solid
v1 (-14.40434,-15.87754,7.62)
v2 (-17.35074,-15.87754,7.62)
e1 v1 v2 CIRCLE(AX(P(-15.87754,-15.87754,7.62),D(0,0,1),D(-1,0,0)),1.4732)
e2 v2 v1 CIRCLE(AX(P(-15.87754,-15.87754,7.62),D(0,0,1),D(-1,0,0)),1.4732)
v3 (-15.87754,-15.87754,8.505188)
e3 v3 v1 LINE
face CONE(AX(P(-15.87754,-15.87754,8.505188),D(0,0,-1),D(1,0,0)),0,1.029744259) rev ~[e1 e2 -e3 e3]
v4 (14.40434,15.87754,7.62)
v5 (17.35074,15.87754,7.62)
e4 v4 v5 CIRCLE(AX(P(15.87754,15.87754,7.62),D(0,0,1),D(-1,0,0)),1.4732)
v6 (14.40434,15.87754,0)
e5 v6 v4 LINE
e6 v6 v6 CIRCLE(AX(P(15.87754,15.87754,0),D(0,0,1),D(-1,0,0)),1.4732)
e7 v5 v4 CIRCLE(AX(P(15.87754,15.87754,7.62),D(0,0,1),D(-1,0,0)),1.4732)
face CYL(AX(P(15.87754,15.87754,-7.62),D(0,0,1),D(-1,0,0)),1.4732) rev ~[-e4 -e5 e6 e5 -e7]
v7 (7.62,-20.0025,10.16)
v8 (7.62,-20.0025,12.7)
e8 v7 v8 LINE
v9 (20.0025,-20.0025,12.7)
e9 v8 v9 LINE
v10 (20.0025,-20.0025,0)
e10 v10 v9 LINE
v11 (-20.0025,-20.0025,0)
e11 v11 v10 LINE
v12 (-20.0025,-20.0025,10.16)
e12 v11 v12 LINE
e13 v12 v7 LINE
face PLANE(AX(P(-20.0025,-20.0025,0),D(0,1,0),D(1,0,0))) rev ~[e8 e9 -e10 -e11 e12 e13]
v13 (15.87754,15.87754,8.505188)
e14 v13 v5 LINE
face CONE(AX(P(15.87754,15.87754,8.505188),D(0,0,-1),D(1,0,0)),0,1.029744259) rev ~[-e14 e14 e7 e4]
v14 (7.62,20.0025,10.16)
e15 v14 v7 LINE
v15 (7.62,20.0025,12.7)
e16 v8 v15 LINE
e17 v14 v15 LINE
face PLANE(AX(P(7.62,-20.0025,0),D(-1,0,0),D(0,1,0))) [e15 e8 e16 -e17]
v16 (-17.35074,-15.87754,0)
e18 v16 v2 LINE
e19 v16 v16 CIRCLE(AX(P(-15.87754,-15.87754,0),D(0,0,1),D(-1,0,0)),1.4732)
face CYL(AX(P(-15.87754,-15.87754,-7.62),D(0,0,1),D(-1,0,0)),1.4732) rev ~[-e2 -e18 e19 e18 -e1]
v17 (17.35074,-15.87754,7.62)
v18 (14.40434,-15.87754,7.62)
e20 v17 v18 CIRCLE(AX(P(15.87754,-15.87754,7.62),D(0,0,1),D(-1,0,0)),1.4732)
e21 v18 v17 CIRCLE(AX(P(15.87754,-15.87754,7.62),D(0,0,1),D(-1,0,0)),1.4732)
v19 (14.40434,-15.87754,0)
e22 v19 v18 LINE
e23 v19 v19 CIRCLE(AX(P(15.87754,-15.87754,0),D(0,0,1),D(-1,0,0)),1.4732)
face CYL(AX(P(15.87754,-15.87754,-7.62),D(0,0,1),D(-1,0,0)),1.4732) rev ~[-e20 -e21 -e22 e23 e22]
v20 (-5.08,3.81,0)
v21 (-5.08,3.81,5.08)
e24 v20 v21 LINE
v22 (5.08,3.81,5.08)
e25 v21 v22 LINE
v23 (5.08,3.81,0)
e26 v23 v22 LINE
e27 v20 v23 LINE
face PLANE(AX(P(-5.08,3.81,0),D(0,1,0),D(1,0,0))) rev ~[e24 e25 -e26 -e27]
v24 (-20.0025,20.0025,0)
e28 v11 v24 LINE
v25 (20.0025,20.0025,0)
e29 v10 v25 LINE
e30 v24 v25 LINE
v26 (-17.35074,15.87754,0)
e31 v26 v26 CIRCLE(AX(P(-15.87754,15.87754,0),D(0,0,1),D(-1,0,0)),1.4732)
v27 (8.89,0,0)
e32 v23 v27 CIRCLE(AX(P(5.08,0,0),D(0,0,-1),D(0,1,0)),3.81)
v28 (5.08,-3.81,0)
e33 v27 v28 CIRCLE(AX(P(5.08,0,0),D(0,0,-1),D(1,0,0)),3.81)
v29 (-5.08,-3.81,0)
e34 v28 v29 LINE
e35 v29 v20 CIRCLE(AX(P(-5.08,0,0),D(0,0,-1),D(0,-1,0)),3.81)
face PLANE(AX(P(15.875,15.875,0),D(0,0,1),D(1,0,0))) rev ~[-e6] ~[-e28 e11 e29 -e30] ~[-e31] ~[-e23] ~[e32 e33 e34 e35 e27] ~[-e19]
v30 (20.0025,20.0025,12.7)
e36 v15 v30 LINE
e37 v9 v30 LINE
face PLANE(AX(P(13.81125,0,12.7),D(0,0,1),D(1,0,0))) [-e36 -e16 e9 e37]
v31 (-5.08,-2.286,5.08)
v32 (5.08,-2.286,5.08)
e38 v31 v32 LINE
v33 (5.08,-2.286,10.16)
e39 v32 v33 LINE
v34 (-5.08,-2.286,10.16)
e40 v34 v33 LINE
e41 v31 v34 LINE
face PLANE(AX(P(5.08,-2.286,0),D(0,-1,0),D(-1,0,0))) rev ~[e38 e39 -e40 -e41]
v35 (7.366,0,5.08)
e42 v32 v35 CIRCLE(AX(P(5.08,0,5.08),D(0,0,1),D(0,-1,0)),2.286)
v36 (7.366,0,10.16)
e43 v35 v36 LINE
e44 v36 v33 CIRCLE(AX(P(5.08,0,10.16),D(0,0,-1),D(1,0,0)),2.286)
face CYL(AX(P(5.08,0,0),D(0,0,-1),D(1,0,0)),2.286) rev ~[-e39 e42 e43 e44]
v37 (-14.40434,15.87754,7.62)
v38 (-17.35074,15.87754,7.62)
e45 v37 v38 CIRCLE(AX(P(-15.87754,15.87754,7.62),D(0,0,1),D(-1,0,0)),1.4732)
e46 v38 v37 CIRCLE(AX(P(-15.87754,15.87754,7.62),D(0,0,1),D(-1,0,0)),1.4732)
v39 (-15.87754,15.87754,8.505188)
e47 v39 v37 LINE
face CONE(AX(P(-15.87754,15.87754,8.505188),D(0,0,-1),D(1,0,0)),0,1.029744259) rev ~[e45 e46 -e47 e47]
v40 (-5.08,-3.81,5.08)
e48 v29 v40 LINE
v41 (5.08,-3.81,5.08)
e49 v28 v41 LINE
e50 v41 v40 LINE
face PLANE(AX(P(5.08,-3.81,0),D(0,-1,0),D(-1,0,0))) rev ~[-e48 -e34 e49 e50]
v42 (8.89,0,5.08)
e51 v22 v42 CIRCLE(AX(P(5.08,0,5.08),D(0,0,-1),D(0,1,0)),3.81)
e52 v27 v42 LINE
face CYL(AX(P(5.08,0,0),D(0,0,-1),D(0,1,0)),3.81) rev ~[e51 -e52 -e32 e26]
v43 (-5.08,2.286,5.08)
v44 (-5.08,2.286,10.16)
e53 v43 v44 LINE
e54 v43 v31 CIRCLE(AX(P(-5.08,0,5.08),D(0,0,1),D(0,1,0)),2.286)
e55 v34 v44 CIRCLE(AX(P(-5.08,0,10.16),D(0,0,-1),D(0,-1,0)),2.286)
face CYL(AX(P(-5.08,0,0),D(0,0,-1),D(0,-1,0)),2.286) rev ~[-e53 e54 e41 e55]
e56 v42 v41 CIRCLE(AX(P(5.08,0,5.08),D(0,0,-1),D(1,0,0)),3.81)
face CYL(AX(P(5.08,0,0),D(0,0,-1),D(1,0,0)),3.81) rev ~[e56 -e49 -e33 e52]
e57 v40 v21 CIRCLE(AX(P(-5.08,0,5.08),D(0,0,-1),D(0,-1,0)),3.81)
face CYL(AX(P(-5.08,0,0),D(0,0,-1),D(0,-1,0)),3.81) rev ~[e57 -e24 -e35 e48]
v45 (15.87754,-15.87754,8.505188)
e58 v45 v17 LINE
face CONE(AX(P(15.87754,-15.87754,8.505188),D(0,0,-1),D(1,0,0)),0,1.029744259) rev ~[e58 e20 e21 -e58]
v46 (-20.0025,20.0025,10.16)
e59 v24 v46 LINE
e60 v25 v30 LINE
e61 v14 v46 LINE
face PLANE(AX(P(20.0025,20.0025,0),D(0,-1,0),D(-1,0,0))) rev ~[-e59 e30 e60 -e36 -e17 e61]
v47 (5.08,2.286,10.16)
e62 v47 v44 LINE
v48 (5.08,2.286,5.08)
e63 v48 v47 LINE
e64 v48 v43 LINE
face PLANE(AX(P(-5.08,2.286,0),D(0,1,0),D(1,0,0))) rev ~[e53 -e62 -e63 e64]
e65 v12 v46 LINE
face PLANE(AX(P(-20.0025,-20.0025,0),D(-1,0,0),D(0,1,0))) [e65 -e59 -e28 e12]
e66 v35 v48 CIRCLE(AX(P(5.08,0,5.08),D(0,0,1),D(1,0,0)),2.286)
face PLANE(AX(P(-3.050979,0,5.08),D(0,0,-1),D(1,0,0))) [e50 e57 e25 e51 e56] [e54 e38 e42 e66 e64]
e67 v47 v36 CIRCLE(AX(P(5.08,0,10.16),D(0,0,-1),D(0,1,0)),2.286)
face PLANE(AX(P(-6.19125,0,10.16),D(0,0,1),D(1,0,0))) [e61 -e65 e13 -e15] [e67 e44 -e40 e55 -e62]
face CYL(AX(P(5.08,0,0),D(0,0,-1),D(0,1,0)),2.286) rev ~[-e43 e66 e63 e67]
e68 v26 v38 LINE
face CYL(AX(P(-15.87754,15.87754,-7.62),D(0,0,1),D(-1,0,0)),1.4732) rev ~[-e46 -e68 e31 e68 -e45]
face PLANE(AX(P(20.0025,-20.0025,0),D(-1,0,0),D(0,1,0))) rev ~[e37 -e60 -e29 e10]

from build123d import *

# Parameters (mm, degrees)
F0_W     = 27.6225
F0_H     = 40.005
F0_R     = 3.302
F0_W_2   = 12.3825
F0_R_2   = 2.159
F1_DEPTH = 10.16
F2_DEPTH = 12.7
F4_DEPTH = 25.4
F5_DEPTH = 5.08
F6_DEPTH = 12.7
F8_D     = 2.9464
F8_DEPTH = 7.62
F8_TIP   = 0.885187864


# Not quite as in the source:
# - a feature names something its author has since deleted; it is built from what else it names


with BuildPart() as f1:
    # F0 (on Top) → F1 (new body)
    with BuildSketch(Plane.XY):
        with Locations((-6.19125, 0)):
            Rectangle(F0_W, F0_H)
        with Locations((-15.875, -15.875)):
            Circle(F0_R, mode=Mode.SUBTRACT)
        with Locations((-15.875, 15.875)):
            Circle(F0_R, mode=Mode.SUBTRACT)
        with Locations((13.81125, 0)):
            Rectangle(F0_W_2, F0_H)
        with Locations((15.875, -15.875)):
            Circle(F0_R, mode=Mode.SUBTRACT)
        with Locations((15.875, 15.875)):
            Circle(F0_R, mode=Mode.SUBTRACT)
        with Locations((-15.875, 15.875)):
            Circle(F0_R)
        with Locations((-15.875, 15.875)):
            Circle(F0_R_2, mode=Mode.SUBTRACT)
        with Locations((15.875, 15.875)):
            Circle(F0_R)
        with Locations((15.875, 15.875)):
            Circle(F0_R_2, mode=Mode.SUBTRACT)
        with Locations((15.875, -15.875)):
            Circle(F0_R)
        with Locations((15.875, -15.875)):
            Circle(F0_R_2, mode=Mode.SUBTRACT)
        with Locations((-15.875, -15.875)):
            Circle(F0_R)
        with Locations((-15.875, -15.875)):
            Circle(F0_R_2, mode=Mode.SUBTRACT)
        with Locations((-15.875, 15.875)):
            Circle(F0_R_2)
        with Locations((15.875, 15.875)):
            Circle(F0_R_2)
        with Locations((15.875, -15.875)):
            Circle(F0_R_2)
        with Locations((-15.875, -15.875)):
            Circle(F0_R_2)
    extrude(amount=F1_DEPTH)

    # F0 (on Top) → F2 (join)
    with BuildSketch(Plane.XY):
        with Locations((13.81125, 0)):
            Rectangle(F0_W_2, F0_H)
        with Locations((15.875, -15.875)):
            Circle(F0_R, mode=Mode.SUBTRACT)
        with Locations((15.875, 15.875)):
            Circle(F0_R, mode=Mode.SUBTRACT)
    extrude(amount=F2_DEPTH)

    # F3 (on face) → F4 (cut)
    with BuildSketch(Plane(origin=(0, 0, 0), x_dir=(1, 0, 0), z_dir=(0, 0, -1))):
        with BuildLine():
            ThreePointArc((-2.794, 0), (-3.4635538982, 1.6164461018), (-5.08, 2.286))
            ThreePointArc((-5.08, 2.286), (-7.366, 0), (-5.08, -2.286))
            ThreePointArc((-5.08, -2.286), (-3.4635538982, -1.6164461018), (-2.794, 0))
        make_face()
        with BuildLine():
            ThreePointArc((7.366, 0), (6.6964461018, 1.6164461018), (5.08, 2.286))
            ThreePointArc((5.08, 2.286), (2.794, 0), (5.08, -2.286))
            ThreePointArc((5.08, -2.286), (6.6964461018, -1.6164461018), (7.366, 0))
        make_face()
        with BuildLine():
            ThreePointArc((-1.27, 0), (-1.4655166344, 1.2048277885), (-2.032, 2.286))
            Line((-2.032, 2.286), (-5.08, 2.286))
            ThreePointArc((-5.08, 2.286), (-3.4635538982, 1.6164461018), (-2.794, 0))
            ThreePointArc((-2.794, 0), (-3.4635538982, -1.6164461018), (-5.08, -2.286))
            Line((-5.08, -2.286), (-2.032, -2.286))
            ThreePointArc((-2.032, -2.286), (-1.4655166344, -1.2048277885), (-1.27, 0))
        make_face()
        with BuildLine():
            ThreePointArc((2.032, -2.286), (1.27, 0), (2.032, 2.286))
            Line((2.032, 2.286), (-2.032, 2.286))
            ThreePointArc((-2.032, 2.286), (-1.4655166344, 1.2048277885), (-1.27, 0))
            ThreePointArc((-1.27, 0), (-1.4655166344, -1.2048277885), (-2.032, -2.286))
            Line((-2.032, -2.286), (2.032, -2.286))
        make_face()
        with BuildLine():
            Line((5.08, 2.286), (2.032, 2.286))
            ThreePointArc((2.032, 2.286), (1.27, 0), (2.032, -2.286))
            Line((2.032, -2.286), (5.08, -2.286))
            ThreePointArc((5.08, -2.286), (2.794, 0), (5.08, 2.286))
        make_face()
    extrude(amount=-F4_DEPTH, mode=Mode.SUBTRACT)

    # F3 (on face) → F5 (cut)
    with BuildSketch(Plane(origin=(0, 0, 0), x_dir=(1, 0, 0), z_dir=(0, 0, -1))):
        with BuildLine():
            ThreePointArc((-1.27, 0), (-1.4655166344, 1.2048277885), (-2.032, 2.286))
            Line((-2.032, 2.286), (-5.08, 2.286))
            ThreePointArc((-5.08, 2.286), (-3.4635538982, 1.6164461018), (-2.794, 0))
            ThreePointArc((-2.794, 0), (-3.4635538982, -1.6164461018), (-5.08, -2.286))
            Line((-5.08, -2.286), (-2.032, -2.286))
            ThreePointArc((-2.032, -2.286), (-1.4655166344, -1.2048277885), (-1.27, 0))
        make_face()
        with BuildLine():
            ThreePointArc((-2.032, 2.286), (-3.3761162011, 3.4077675977), (-5.08, 3.81))
            ThreePointArc((-5.08, 3.81), (-8.89, 0), (-5.08, -3.81))
            ThreePointArc((-5.08, -3.81), (-3.3761162011, -3.4077675977), (-2.032, -2.286))
            Line((-2.032, -2.286), (-5.08, -2.286))
            ThreePointArc((-5.08, -2.286), (-7.366, 0), (-5.08, 2.286))
            Line((-5.08, 2.286), (-2.032, 2.286))
        make_face()
        with BuildLine():
            ThreePointArc((2.032, 2.286), (3.3761162011, 3.4077675977), (5.08, 3.81))
            Line((5.08, 3.81), (-5.08, 3.81))
            ThreePointArc((-5.08, 3.81), (-3.3761162011, 3.4077675977), (-2.032, 2.286))
            Line((-2.032, 2.286), (2.032, 2.286))
        make_face()
        with BuildLine():
            ThreePointArc((2.032, -2.286), (1.27, 0), (2.032, 2.286))
            Line((2.032, 2.286), (-2.032, 2.286))
            ThreePointArc((-2.032, 2.286), (-1.4655166344, 1.2048277885), (-1.27, 0))
            ThreePointArc((-1.27, 0), (-1.4655166344, -1.2048277885), (-2.032, -2.286))
            Line((-2.032, -2.286), (2.032, -2.286))
        make_face()
        with BuildLine():
            Line((5.08, 2.286), (2.032, 2.286))
            ThreePointArc((2.032, 2.286), (1.27, 0), (2.032, -2.286))
            Line((2.032, -2.286), (5.08, -2.286))
            ThreePointArc((5.08, -2.286), (2.794, 0), (5.08, 2.286))
        make_face()
        with BuildLine():
            ThreePointArc((5.08, -3.81), (7.7740768363, -2.6940768363), (8.89, 0))
            ThreePointArc((8.89, 0), (7.7740768363, 2.6940768363), (5.08, 3.81))
            ThreePointArc((5.08, 3.81), (3.3761162011, 3.4077675977), (2.032, 2.286))
            Line((2.032, 2.286), (5.08, 2.286))
            ThreePointArc((5.08, 2.286), (6.6964461018, 1.6164461018), (7.366, 0))
            ThreePointArc((7.366, 0), (6.6964461018, -1.6164461018), (5.08, -2.286))
            Line((5.08, -2.286), (2.032, -2.286))
            ThreePointArc((2.032, -2.286), (3.3761162011, -3.4077675977), (5.08, -3.81))
        make_face()
        with BuildLine():
            Line((-5.08, -3.81), (5.08, -3.81))
            ThreePointArc((5.08, -3.81), (3.3761162011, -3.4077675977), (2.032, -2.286))
            Line((2.032, -2.286), (-2.032, -2.286))
            ThreePointArc((-2.032, -2.286), (-3.3761162011, -3.4077675977), (-5.08, -3.81))
        make_face()
    extrude(amount=-F5_DEPTH, mode=Mode.SUBTRACT)

    # F0 (on Top) → F6 (join)
    with BuildSketch(Plane.XY):
        with Locations((15.875, 15.875)):
            Circle(F0_R)
        with Locations((15.875, 15.875)):
            Circle(F0_R_2, mode=Mode.SUBTRACT)
        with Locations((15.875, 15.875)):
            Circle(F0_R_2)
        with Locations((15.875, -15.875)):
            Circle(F0_R)
        with Locations((15.875, -15.875)):
            Circle(F0_R_2, mode=Mode.SUBTRACT)
        with Locations((15.875, -15.875)):
            Circle(F0_R_2)
    extrude(amount=F6_DEPTH)

    # F8
    with Locations(Plane(origin=(0, 0, 0), x_dir=(1, 0, 0), z_dir=(0, 0, -1))):
        with Locations((-15.87754, 15.87754), (15.87754, 15.87754), (15.87754, -15.87754), (-15.87754, -15.87754)):
            Hole(F8_D / 2, depth=F8_DEPTH)
            with Locations((0, 0, -(F8_DEPTH + F8_TIP / 2))):  # 118° drill point
                Cone(0, F8_D / 2, F8_TIP, mode=Mode.SUBTRACT)


solid = f1.part
